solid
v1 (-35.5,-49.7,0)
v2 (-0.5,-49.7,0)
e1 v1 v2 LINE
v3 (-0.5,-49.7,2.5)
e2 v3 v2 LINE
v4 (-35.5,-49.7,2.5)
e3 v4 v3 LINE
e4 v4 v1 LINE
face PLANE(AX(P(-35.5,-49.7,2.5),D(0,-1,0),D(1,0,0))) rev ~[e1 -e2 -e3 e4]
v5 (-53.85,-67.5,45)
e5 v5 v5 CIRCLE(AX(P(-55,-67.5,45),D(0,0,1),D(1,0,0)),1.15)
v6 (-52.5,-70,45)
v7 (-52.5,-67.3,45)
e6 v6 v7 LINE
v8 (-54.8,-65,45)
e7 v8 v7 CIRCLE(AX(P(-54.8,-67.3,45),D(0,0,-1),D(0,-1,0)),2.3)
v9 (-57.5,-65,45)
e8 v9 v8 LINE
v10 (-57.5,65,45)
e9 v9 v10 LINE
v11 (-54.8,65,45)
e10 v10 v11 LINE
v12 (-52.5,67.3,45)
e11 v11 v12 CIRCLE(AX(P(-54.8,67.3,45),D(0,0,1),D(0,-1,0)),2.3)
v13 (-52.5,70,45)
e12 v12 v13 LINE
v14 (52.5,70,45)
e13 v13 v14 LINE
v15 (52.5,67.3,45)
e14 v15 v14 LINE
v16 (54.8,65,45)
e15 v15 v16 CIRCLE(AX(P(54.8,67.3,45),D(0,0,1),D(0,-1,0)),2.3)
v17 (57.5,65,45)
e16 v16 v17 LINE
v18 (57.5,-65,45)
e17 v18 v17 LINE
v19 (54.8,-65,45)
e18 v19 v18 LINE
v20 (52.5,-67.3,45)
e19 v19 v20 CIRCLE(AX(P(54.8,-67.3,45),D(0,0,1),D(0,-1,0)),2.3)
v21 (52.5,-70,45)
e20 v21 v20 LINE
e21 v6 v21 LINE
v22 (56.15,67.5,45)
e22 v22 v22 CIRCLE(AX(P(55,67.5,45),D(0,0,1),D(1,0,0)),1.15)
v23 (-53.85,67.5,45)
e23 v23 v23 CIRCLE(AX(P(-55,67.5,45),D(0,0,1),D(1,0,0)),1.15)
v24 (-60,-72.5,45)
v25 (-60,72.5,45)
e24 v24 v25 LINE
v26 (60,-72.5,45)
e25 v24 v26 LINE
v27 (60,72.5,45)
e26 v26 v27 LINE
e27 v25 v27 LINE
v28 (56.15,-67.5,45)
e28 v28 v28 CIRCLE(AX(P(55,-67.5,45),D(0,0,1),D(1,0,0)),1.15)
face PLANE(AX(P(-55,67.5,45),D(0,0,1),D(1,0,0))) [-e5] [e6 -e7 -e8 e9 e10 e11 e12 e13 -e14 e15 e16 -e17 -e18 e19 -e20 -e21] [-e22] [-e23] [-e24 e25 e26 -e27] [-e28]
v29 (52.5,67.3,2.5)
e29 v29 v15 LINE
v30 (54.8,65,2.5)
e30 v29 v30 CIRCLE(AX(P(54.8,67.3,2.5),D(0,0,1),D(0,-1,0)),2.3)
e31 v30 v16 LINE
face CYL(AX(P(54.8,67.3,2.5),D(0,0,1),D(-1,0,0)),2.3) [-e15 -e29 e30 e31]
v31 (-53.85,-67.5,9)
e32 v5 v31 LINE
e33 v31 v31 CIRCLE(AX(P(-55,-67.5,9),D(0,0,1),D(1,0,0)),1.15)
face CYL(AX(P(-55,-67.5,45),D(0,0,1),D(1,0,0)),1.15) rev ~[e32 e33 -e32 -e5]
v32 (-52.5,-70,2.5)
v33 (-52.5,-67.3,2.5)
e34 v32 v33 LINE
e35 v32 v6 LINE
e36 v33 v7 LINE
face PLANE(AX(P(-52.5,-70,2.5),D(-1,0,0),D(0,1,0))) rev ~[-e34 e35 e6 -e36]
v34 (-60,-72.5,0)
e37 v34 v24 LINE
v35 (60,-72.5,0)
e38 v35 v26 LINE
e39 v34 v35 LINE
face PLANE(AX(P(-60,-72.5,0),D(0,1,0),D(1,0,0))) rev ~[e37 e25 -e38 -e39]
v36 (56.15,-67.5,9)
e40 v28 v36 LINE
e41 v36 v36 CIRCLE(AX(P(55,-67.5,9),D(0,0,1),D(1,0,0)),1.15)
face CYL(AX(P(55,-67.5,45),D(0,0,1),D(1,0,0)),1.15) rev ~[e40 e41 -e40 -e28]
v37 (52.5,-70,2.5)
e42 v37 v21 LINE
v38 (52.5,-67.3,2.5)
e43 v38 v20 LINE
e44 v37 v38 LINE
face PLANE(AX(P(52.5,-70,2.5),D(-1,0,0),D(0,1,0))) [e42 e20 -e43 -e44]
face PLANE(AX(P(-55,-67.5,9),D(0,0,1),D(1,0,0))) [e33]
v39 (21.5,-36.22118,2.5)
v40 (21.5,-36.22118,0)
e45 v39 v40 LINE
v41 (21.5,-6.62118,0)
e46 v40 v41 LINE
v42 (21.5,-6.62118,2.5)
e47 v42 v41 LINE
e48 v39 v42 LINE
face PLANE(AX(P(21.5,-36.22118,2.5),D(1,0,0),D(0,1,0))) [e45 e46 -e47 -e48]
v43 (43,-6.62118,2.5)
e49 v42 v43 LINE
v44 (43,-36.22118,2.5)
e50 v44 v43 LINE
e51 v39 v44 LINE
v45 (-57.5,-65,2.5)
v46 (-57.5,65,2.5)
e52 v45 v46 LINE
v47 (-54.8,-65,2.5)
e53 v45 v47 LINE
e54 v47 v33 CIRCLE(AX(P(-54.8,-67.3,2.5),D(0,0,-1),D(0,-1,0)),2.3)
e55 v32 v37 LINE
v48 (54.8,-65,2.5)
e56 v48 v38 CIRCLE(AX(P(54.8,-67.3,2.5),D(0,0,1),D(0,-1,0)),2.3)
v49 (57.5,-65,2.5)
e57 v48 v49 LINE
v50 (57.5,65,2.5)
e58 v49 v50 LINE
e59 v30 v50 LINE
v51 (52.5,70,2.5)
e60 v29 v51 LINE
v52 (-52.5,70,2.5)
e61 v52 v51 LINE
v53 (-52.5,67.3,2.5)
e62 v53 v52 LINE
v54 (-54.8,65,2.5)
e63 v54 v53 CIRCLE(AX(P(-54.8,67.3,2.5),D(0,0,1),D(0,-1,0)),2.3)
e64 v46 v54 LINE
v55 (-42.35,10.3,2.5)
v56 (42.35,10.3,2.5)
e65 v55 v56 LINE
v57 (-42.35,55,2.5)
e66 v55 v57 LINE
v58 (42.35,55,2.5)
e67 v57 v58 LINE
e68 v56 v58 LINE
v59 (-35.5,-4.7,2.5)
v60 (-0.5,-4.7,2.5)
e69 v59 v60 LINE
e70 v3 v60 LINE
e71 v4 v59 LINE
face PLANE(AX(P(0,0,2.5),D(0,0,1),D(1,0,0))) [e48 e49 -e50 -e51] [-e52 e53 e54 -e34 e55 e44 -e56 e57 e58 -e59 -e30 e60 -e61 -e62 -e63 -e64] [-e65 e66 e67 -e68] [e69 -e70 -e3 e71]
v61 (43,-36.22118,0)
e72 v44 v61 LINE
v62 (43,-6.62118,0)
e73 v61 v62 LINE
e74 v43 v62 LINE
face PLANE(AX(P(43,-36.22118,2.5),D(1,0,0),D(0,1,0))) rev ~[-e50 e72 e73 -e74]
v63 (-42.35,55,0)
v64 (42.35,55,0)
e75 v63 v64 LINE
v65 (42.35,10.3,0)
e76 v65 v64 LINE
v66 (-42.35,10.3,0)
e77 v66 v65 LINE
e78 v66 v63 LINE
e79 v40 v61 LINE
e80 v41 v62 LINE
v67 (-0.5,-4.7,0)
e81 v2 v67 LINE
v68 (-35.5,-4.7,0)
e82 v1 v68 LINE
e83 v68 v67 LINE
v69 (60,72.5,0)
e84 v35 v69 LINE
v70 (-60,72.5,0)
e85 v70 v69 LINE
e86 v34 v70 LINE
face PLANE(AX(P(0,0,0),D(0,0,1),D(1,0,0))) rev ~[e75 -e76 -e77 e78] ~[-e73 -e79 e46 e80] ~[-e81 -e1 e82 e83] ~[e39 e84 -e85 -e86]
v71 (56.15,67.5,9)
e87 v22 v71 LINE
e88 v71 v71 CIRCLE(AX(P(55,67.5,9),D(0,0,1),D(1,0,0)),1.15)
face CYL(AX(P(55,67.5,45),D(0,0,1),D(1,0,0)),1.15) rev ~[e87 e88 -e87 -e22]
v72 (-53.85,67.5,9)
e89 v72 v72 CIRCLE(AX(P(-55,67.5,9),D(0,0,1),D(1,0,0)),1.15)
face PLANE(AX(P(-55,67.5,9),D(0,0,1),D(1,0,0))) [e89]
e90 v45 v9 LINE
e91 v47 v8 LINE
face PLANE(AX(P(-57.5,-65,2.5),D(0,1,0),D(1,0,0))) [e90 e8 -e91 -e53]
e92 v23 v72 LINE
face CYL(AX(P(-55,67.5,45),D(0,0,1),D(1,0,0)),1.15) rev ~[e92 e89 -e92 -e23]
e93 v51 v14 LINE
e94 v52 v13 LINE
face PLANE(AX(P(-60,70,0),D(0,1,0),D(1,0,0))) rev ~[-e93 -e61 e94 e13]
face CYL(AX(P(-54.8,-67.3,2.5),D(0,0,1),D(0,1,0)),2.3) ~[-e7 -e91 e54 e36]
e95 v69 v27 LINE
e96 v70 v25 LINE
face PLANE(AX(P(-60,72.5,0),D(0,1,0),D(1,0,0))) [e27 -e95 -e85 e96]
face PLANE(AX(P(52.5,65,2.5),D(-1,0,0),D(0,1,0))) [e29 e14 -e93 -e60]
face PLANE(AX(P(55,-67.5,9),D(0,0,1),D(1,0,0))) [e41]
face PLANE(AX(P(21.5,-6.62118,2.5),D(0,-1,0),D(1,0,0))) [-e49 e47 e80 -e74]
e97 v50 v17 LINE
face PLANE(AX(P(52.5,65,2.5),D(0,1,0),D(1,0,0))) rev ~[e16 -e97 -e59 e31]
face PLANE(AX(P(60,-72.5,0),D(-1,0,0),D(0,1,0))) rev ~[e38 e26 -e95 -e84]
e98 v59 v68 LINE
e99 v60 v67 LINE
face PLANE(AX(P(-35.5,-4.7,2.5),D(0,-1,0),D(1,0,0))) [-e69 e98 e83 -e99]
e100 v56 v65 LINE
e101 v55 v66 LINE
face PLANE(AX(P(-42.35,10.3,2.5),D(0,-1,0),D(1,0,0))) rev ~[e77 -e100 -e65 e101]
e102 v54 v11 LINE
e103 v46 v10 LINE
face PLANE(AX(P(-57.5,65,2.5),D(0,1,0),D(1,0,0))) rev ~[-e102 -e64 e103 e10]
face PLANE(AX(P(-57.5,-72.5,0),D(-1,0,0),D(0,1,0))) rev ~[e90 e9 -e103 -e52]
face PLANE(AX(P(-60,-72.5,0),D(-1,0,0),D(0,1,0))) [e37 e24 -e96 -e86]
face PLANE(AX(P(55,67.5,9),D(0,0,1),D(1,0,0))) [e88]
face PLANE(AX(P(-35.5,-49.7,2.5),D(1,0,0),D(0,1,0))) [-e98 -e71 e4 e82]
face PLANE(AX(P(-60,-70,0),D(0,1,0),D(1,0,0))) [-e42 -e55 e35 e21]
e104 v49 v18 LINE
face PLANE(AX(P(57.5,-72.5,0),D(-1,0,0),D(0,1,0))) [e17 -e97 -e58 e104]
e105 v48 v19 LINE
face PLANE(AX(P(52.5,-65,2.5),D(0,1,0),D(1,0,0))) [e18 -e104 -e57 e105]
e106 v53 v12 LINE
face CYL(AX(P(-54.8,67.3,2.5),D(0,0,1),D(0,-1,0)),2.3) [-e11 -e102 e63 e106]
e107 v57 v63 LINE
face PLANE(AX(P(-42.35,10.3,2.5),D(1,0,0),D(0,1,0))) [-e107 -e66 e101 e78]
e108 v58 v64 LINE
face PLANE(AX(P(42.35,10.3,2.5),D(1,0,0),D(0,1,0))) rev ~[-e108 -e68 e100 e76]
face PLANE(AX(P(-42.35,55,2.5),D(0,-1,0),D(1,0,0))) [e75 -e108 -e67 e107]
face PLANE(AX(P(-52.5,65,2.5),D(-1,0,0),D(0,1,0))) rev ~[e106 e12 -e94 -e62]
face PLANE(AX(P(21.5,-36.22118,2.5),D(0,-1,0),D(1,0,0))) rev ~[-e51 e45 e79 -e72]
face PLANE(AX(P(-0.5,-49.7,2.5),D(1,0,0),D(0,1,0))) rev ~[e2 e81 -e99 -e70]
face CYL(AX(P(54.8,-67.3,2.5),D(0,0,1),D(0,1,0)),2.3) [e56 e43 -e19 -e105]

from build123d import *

# Parameters (mm, degrees)
F4_W      = 120
F4_H      = 145
F5_DEPTH  = 45
F6_T      = -2.5
F8_W      = 35
F8_H      = 45
F8_W_2    = 21.5
F8_H_2    = 29.6
F7_W      = 84.7
F7_H      = 44.7
F9_DEPTH  = 2.5
F10_W     = 5
F10_H     = 5
F11_DEPTH = 42.5
F12_R     = 1.15
F13_DEPTH = 36
F14_R     = 2.3


with BuildPart() as f5:
    # F4 (on Top) → F5 (new body)
    with BuildSketch(Plane.XY):
        Rectangle(F4_W, F4_H)
    extrude(amount=F5_DEPTH)

    # F6
    f6_openings = [f5.faces().sort_by_distance(p)[0] for p in [
        (0, 0, 45),
    ]]
    offset(amount=F6_T, openings=f6_openings)

    # F8 (on face) + F7 (on face) → F9 (cut)
    with BuildSketch(Plane.XY.offset(2.5)):
        with Locations((-18, -27.2)):
            Rectangle(F8_W, F8_H)
        with Locations((32.25, -21.4211801112)):
            Rectangle(F8_W_2, F8_H_2)
    with BuildSketch(Plane.XY.offset(2.5)):
        with Locations((0, 32.65)):
            Rectangle(F7_W, F7_H)
    extrude(amount=-F9_DEPTH, mode=Mode.SUBTRACT)

    # F10 (on face) → F11 (join)
    with BuildSketch(Plane.XY.offset(2.5)):
        with Locations((-55, 67.5)):
            Rectangle(F10_W, F10_H)
        with Locations((-55, -67.5)):
            Rectangle(F10_W, F10_H)
        with Locations((55, -67.5)):
            Rectangle(F10_W, F10_H)
        with Locations((55, 67.5)):
            Rectangle(F10_W, F10_H)
    extrude(amount=F11_DEPTH)

    # F12 (on face) → F13 (cut)
    with BuildSketch(Plane.XY.offset(45)):
        with Locations((-55, 67.5)):
            Circle(F12_R)
        with Locations((55, 67.5)):
            Circle(F12_R)
        with Locations((55, -67.5)):
            Circle(F12_R)
        with Locations((-55, -67.5)):
            Circle(F12_R)
    extrude(amount=-F13_DEPTH, mode=Mode.SUBTRACT)

    # F14
    f14_edges = [f5.edges().sort_by_distance(p)[0] for p in [
        (-52.5, 65, 23.75),
        (52.5, 65, 23.75),
        (52.5, -65, 23.75),
        (-52.5, -65, 23.75),
    ]]
    fillet(f14_edges, radius=F14_R)


solid = f5.part
